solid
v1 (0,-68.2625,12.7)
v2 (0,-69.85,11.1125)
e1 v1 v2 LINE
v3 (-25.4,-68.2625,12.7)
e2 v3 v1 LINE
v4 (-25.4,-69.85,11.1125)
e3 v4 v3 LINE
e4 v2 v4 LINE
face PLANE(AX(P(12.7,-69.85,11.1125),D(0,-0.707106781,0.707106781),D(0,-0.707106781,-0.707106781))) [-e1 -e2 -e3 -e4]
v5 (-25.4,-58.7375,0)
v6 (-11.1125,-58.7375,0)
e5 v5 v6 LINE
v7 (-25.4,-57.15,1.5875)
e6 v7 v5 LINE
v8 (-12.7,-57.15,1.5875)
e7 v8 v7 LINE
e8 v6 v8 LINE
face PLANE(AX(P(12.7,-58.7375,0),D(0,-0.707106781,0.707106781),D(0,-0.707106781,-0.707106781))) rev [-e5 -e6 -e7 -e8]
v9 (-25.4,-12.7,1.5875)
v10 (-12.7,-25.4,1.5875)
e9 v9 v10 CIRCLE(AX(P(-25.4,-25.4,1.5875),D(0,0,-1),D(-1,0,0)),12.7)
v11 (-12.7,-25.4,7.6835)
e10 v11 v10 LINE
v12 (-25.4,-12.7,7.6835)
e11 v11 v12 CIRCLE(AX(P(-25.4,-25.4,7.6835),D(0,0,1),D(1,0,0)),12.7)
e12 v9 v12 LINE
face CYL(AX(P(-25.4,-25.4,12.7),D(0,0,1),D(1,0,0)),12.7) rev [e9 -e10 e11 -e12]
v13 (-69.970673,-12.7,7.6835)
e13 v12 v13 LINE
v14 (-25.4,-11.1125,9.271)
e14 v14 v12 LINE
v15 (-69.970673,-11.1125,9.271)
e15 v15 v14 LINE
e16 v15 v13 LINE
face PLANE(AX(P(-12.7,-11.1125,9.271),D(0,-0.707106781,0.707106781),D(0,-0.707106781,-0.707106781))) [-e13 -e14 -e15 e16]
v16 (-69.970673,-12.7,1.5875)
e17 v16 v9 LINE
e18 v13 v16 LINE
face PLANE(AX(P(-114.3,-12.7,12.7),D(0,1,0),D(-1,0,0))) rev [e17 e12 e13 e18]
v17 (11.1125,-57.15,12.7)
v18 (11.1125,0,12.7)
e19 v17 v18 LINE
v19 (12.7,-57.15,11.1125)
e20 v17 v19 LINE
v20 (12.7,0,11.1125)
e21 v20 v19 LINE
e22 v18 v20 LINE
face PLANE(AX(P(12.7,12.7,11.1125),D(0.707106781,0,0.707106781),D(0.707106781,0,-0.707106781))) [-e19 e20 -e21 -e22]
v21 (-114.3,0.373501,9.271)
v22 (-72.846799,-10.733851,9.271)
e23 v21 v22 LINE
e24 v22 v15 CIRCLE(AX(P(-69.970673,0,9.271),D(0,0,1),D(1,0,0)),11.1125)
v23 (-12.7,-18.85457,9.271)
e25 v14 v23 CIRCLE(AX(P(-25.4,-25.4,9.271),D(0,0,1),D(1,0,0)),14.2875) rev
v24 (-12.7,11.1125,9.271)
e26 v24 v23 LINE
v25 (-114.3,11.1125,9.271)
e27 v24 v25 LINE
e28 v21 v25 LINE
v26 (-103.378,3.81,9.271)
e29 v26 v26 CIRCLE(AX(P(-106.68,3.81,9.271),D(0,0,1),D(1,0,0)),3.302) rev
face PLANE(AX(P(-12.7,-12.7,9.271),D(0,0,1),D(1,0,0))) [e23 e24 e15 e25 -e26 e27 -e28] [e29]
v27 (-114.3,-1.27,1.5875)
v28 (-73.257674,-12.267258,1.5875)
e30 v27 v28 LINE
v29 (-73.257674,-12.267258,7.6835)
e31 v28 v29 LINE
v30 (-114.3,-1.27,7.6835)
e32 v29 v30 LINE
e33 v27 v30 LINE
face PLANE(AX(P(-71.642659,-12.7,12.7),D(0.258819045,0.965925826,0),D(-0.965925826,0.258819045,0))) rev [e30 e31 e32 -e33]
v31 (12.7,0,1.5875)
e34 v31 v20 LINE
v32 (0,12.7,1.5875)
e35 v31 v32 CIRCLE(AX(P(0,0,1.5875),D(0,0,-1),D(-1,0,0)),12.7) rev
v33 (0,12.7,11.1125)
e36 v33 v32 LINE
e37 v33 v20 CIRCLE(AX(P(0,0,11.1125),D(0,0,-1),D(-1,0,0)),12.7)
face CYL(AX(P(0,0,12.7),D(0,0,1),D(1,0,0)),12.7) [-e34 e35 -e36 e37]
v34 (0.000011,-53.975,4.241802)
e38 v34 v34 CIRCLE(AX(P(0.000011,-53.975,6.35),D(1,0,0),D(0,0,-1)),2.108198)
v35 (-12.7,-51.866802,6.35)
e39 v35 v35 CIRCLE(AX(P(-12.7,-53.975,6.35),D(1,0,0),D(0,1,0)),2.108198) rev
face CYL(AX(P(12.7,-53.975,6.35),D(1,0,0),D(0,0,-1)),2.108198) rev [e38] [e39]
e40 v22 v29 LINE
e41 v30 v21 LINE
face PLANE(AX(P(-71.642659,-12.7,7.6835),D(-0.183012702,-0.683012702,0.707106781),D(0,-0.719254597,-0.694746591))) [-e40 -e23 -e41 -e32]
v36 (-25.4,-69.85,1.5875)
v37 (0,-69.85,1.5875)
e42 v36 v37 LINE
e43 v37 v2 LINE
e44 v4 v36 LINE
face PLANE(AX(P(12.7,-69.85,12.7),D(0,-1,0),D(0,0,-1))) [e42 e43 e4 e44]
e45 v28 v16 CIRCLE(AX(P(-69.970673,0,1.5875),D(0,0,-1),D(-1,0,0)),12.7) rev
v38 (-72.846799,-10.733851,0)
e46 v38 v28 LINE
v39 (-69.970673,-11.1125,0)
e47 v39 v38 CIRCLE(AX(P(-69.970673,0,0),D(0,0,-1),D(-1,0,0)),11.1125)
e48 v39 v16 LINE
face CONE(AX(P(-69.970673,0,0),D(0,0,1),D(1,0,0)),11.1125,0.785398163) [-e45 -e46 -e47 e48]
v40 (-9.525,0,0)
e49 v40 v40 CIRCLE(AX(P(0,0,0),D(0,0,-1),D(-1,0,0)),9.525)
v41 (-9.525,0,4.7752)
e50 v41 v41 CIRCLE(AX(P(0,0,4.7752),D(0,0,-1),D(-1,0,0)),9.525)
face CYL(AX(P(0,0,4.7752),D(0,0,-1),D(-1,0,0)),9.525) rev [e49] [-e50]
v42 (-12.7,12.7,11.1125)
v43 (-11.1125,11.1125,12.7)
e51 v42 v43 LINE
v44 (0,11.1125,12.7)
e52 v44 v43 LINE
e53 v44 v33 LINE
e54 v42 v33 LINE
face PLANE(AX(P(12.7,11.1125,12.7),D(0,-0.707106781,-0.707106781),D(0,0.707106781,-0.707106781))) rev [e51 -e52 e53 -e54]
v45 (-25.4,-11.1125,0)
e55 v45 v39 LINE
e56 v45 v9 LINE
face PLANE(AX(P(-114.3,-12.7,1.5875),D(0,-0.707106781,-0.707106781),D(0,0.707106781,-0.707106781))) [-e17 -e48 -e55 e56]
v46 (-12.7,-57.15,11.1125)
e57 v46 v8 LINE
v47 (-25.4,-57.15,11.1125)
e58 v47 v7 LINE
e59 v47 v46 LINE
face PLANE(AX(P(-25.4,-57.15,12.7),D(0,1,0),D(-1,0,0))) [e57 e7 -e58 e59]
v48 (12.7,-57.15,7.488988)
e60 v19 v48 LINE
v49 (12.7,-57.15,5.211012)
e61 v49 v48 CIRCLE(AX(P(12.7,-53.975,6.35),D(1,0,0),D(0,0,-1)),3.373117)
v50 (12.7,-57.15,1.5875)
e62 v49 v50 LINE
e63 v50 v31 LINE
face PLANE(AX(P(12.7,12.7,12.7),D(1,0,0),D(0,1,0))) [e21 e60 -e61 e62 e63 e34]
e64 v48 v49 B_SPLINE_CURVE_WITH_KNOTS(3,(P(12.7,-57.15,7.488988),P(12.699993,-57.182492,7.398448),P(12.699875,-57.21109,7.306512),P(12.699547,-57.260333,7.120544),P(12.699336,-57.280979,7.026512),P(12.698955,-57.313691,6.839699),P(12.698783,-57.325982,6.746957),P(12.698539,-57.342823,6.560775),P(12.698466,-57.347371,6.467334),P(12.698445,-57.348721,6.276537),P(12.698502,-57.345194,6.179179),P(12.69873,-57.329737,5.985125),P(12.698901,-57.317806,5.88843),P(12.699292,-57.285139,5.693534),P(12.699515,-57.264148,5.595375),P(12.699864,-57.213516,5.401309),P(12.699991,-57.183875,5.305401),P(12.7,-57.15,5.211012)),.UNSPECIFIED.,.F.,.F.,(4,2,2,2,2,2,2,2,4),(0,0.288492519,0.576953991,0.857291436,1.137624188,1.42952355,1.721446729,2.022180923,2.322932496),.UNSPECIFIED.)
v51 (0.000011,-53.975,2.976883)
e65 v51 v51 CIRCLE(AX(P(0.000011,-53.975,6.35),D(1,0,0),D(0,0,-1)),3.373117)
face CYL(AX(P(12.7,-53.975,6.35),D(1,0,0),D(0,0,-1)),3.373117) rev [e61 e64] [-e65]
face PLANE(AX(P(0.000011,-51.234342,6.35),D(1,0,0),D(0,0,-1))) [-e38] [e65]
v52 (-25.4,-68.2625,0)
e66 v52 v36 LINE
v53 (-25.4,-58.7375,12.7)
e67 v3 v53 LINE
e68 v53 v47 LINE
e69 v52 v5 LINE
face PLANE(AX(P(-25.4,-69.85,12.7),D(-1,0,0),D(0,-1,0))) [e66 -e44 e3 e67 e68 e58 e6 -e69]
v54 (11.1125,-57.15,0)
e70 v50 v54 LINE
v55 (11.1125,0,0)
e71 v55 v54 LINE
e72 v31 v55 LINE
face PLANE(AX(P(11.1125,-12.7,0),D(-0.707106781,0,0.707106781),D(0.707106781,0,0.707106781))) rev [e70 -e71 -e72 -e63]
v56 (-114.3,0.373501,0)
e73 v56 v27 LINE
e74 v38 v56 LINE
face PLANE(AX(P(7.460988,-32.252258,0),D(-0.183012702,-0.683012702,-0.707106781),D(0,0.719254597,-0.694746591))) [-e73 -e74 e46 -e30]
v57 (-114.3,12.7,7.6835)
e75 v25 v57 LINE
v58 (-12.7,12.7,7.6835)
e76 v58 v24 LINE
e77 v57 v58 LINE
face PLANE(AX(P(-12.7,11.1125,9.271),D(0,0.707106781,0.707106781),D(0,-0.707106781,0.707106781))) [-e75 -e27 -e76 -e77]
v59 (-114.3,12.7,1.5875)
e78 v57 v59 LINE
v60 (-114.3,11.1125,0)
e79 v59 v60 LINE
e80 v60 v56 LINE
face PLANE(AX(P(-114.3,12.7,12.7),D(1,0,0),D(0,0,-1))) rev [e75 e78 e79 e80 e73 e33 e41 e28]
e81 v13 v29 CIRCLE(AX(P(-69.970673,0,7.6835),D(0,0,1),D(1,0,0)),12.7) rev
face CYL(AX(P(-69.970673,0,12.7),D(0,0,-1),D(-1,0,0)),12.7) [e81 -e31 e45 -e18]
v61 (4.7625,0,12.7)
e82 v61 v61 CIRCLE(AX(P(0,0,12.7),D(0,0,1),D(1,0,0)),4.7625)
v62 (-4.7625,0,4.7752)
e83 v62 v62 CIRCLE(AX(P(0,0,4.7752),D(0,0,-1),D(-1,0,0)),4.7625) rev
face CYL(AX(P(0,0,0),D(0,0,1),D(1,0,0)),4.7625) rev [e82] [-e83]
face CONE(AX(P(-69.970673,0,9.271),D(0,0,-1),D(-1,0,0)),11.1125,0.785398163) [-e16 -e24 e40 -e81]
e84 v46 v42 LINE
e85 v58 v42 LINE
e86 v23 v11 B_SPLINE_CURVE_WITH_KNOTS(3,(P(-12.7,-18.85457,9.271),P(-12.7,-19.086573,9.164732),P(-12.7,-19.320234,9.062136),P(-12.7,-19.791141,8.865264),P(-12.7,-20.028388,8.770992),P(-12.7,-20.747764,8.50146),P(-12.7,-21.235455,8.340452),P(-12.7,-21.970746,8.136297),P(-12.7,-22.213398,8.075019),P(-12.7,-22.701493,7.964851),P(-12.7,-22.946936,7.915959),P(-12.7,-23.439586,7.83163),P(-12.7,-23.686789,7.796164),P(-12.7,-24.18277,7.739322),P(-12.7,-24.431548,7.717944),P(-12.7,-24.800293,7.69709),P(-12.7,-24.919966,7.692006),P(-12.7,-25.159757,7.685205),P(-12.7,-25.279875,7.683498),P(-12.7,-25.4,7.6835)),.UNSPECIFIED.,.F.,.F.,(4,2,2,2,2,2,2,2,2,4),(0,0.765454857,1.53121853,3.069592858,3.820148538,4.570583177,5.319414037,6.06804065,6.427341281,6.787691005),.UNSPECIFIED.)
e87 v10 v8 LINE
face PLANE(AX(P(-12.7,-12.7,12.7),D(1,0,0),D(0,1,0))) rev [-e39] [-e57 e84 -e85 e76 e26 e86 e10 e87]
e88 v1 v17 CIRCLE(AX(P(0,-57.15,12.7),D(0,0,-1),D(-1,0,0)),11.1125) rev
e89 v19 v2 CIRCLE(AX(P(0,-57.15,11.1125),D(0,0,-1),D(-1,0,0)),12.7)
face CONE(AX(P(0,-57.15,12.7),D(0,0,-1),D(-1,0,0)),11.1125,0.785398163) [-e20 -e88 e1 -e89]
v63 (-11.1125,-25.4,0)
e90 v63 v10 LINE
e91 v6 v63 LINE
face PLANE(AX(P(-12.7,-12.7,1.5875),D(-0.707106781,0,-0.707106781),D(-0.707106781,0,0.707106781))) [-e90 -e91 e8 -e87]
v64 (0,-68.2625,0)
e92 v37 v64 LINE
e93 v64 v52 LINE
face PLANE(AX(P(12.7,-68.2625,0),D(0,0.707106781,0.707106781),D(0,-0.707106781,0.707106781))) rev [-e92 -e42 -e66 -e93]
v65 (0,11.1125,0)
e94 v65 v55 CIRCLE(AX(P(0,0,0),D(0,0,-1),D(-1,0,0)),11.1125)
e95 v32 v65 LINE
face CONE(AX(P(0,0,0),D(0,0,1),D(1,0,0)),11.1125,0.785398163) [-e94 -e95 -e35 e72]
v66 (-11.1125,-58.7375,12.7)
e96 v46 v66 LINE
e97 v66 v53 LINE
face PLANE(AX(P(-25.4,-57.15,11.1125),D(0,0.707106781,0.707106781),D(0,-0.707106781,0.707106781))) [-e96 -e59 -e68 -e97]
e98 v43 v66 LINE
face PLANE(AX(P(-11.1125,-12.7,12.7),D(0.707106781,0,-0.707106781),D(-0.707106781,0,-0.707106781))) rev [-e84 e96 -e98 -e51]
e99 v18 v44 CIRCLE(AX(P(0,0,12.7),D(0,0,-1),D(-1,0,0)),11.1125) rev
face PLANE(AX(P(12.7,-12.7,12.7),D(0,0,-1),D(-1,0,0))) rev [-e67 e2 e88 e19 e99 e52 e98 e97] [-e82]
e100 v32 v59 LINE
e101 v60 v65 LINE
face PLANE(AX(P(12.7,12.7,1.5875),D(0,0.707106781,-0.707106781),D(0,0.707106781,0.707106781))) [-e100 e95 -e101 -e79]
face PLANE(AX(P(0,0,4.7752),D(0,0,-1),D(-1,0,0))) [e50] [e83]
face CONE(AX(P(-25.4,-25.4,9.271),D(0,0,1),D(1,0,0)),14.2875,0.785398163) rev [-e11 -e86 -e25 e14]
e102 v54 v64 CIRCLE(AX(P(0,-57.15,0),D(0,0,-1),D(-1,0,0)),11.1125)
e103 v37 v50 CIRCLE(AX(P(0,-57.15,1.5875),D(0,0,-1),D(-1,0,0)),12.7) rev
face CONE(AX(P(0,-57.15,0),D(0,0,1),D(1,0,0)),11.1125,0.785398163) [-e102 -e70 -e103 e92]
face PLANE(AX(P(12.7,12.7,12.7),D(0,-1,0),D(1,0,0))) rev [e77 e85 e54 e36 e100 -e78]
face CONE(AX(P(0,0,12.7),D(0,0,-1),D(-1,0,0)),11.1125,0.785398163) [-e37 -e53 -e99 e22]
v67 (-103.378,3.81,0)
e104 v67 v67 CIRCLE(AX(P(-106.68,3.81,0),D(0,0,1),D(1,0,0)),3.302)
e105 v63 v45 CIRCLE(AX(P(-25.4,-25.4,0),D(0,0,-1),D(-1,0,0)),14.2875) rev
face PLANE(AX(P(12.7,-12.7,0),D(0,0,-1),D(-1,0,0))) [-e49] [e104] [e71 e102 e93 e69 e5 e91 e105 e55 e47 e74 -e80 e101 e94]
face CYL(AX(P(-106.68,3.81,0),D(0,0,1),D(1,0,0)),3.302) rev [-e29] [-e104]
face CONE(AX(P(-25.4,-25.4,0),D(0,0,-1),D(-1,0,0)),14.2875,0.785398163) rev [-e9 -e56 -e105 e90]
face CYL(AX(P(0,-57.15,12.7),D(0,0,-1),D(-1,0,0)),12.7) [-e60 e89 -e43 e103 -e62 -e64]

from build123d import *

# Parameters (mm, degrees)
BASE_EXTRUDE_DEPTH = 12.7
SKETCH2_R          = 4.7625
CUT_EXTRUDE1_DEPTH = 135.554087638
SKETCH3_R          = 3.302
CUT_EXTRUDE2_DEPTH = 106.159296474
CHAMFER1_SIZE      = 11.43
CHAMFER1_SIZE2     = 42.657340731
SKETCH5_W          = 101.6
SKETCH5_H          = 25.4
CUT_EXTRUDE4_DEPTH = 3.429
FILLET2_R          = 12.7
CHAMFER2_SIZE      = 1.5875
CHAMFER3_SIZE      = 1.5875
SKETCH8_R          = 9.525
CUT_EXTRUDE5_DEPTH = 4.7752


with BuildPart() as part:
    # Sketch1 → Base-Extrude (new body)
    with BuildSketch(Plane.XY):
        Polygon((-114.3, 12.7), (-114.3, -12.7), (-12.7, -12.7), (-12.7, -57.15), (-25.4, -57.15), (-25.4, -69.85), (12.7, -69.85), (12.7, 12.7), align=None)
    extrude(amount=BASE_EXTRUDE_DEPTH)

    # Sketch2 → Cut-Extrude1 (cut, through all)
    with BuildSketch(Plane.XY.offset(12.7)):
        Circle(SKETCH2_R)
    extrude(amount=-CUT_EXTRUDE1_DEPTH, mode=Mode.SUBTRACT)

    # Sketch3 → Cut-Extrude2 (cut, through all)
    with BuildSketch(Plane(origin=(-40.826123223, 4.303739396, 12.7), x_dir=(1, 0, 0), z_dir=(0, 0, 1))):
        with Locations((-65.853876777, -0.493739396)):
            Circle(SKETCH3_R)
    extrude(amount=-CUT_EXTRUDE2_DEPTH, mode=Mode.SUBTRACT)

    # Chamfer1
    chamfer1_edges = [part.edges().sort_by_distance(p)[0] for p in [
        (-114.3, -12.7, 6.35),
    ]]
    chamfer1_side = [part.faces().sort_by_distance(p)[0] for p in [
        (-114.3, 0, 6.35),
    ]]
    chamfer(chamfer1_edges, length=CHAMFER1_SIZE, length2=CHAMFER1_SIZE2, reference=chamfer1_side[0])

    # Sketch5 → Cut-Extrude4 (cut)
    with BuildSketch(Plane(origin=(-65.557986772, -0.200650606, 12.7), x_dir=(1, 0, 0), z_dir=(0, 0, 1))):
        with Locations((2.057986772, 0.200650606)):
            Rectangle(SKETCH5_W, SKETCH5_H)
    extrude(amount=-CUT_EXTRUDE4_DEPTH, mode=Mode.SUBTRACT)

    # Sketch7 → Hole1 (revolve, cut)
    with BuildSketch(Plane(origin=(12.7, -53.975, 6.35), x_dir=(0, 0, -1), z_dir=(0, 1, 0))):
        Polygon((0, 0), (0, 127), (2.108198174, 127), (2.108198174, 126.997460002), (2.108198174, 12.699989143), (2.740657626, 12.699989), (3.373117078, 12.699989), (3.373117078, 6.3499945), (3.373117078, 0), align=None)
    revolve(axis=Axis((12.7, -53.975, 6.35), (-1, 0, 0)), mode=Mode.SUBTRACT)

    # Fillet2
    # the kernel refuses this fillet: 12.7 mm, written as the material it adds along each edge
    with BuildSketch(Plane(origin=(-12.7, -12.7, 0), x_dir=(-1, 0, 0), z_dir=(0, 0, 1))) as fillet2_piece_1:
        with BuildLine():
            CenterArc((FILLET2_R, FILLET2_R), FILLET2_R, 180, 90)
            Line((0, FILLET2_R), (0, 0))
            Line((0, 0), (FILLET2_R, 0))
        make_face()
    extrude(amount=9.271)
    # the kernel refuses this fillet: 12.7 mm, written as the material it takes off along each edge
    with BuildSketch(Plane(origin=(12.7, 12.7, -31.75), x_dir=(0, -1, 0), z_dir=(0, 0, 1))) as fillet2_2_piece_1:
        with BuildLine():
            CenterArc((FILLET2_R, -FILLET2_R), FILLET2_R, 90, 90)
            Line((0, -FILLET2_R), (0, 0))
            Line((0, 0), (FILLET2_R, 0))
        make_face()
    extrude(amount=76.2, mode=Mode.SUBTRACT)
    with BuildSketch(Plane(origin=(12.7, -69.85, -31.75), x_dir=(0, 1, 0), z_dir=(0, 0, 1))) as fillet2_2_piece_2:
        with BuildLine():
            CenterArc((FILLET2_R, FILLET2_R), FILLET2_R, 180, 90)
            Line((0, FILLET2_R), (0, 0))
            Line((0, 0), (FILLET2_R, 0))
        make_face()
    extrude(amount=76.2, mode=Mode.SUBTRACT)
    with BuildSketch(Plane(origin=(-71.642659269, -12.7, -4.179966798), x_dir=(1, 0, 0), z_dir=(0, 0, 1))) as fillet2_2_piece_3:
        with BuildLine():
            CenterArc((FILLET2_R * 0.131652497587, FILLET2_R), FILLET2_R, 255, 15)
            Line((-FILLET2_R * 0.127166547515, FILLET2_R * 0.0340741737109), (0, 0))
            Line((0, 0), (FILLET2_R * 0.131652497587, 0))
        make_face()
    extrude(amount=17.630933597, mode=Mode.SUBTRACT)

    # Chamfer2
    chamfer2_edges = [part.edges().sort_by_distance(p)[0] for p in [
        (-57.15, 12.7, 0),
        (12.7, -28.575, 0),
        (-12.7, -69.85, 0),
        (8.980256121, -66.130256121, 0),
        (8.980256121, 8.980256121, 0),
    ]]
    chamfer(chamfer2_edges, length=CHAMFER2_SIZE)

    # Chamfer3
    chamfer3_edges = [part.edges().sort_by_distance(p)[0] for p in [
        (-19.05, -57.15, 0),
    ]]
    chamfer(chamfer3_edges, length=CHAMFER3_SIZE)
    chamfer3_2_edges = [part.edges().sort_by_distance(p)[0] for p in [
        (-12.7, -41.275, 0),
        (-16.419743879, -16.419743879, 0),
        (-47.685336275, -12.7, 0),
        (-71.628355191, -12.591349739, 0),
        (-93.778837211, -6.768628997, 0),
    ]]
    chamfer(chamfer3_2_edges, length=CHAMFER3_SIZE)
    chamfer3_3_edges = [part.edges().sort_by_distance(p)[0] for p in [
        (-19.05, -57.15, 12.7),
    ]]
    chamfer(chamfer3_3_edges, length=CHAMFER3_SIZE)
    chamfer3_4_edges = [part.edges().sort_by_distance(p)[0] for p in [
        (-12.7, -22.225, 12.7),
    ]]
    chamfer(chamfer3_4_edges, length=CHAMFER3_SIZE)
    chamfer3_5_edges = [part.edges().sort_by_distance(p)[0] for p in [
        (-16.419743879, -16.419743879, 9.271),
        (-47.685336275, -12.7, 9.271),
        (-71.628355191, -12.591349739, 9.271),
        (-93.778837211, -6.768628997, 9.271),
    ]]
    chamfer(chamfer3_5_edges, length=CHAMFER3_SIZE)
    chamfer3_6_edges = [part.edges().sort_by_distance(p)[0] for p in [
        (-12.7, -69.85, 12.7),
        (8.980256121, 8.980256121, 12.7),
        (12.7, -28.575, 12.7),
        (8.980256121, -66.130256121, 12.7),
        (-5.55625, 12.7, 12.7),
    ]]
    chamfer(chamfer3_6_edges, length=CHAMFER3_SIZE)
    chamfer3_7_edges = [part.edges().sort_by_distance(p)[0] for p in [
        (-63.5, 12.7, 9.271),
    ]]
    chamfer(chamfer3_7_edges, length=CHAMFER3_SIZE)

    # Sketch8 → Cut-Extrude5 (cut)
    with BuildSketch(Plane(origin=(0, 0, 0), x_dir=(-1, 0, 0), z_dir=(0, 0, -1))):
        Circle(SKETCH8_R)
    extrude(amount=-CUT_EXTRUDE5_DEPTH, mode=Mode.SUBTRACT)


solid = part.part
